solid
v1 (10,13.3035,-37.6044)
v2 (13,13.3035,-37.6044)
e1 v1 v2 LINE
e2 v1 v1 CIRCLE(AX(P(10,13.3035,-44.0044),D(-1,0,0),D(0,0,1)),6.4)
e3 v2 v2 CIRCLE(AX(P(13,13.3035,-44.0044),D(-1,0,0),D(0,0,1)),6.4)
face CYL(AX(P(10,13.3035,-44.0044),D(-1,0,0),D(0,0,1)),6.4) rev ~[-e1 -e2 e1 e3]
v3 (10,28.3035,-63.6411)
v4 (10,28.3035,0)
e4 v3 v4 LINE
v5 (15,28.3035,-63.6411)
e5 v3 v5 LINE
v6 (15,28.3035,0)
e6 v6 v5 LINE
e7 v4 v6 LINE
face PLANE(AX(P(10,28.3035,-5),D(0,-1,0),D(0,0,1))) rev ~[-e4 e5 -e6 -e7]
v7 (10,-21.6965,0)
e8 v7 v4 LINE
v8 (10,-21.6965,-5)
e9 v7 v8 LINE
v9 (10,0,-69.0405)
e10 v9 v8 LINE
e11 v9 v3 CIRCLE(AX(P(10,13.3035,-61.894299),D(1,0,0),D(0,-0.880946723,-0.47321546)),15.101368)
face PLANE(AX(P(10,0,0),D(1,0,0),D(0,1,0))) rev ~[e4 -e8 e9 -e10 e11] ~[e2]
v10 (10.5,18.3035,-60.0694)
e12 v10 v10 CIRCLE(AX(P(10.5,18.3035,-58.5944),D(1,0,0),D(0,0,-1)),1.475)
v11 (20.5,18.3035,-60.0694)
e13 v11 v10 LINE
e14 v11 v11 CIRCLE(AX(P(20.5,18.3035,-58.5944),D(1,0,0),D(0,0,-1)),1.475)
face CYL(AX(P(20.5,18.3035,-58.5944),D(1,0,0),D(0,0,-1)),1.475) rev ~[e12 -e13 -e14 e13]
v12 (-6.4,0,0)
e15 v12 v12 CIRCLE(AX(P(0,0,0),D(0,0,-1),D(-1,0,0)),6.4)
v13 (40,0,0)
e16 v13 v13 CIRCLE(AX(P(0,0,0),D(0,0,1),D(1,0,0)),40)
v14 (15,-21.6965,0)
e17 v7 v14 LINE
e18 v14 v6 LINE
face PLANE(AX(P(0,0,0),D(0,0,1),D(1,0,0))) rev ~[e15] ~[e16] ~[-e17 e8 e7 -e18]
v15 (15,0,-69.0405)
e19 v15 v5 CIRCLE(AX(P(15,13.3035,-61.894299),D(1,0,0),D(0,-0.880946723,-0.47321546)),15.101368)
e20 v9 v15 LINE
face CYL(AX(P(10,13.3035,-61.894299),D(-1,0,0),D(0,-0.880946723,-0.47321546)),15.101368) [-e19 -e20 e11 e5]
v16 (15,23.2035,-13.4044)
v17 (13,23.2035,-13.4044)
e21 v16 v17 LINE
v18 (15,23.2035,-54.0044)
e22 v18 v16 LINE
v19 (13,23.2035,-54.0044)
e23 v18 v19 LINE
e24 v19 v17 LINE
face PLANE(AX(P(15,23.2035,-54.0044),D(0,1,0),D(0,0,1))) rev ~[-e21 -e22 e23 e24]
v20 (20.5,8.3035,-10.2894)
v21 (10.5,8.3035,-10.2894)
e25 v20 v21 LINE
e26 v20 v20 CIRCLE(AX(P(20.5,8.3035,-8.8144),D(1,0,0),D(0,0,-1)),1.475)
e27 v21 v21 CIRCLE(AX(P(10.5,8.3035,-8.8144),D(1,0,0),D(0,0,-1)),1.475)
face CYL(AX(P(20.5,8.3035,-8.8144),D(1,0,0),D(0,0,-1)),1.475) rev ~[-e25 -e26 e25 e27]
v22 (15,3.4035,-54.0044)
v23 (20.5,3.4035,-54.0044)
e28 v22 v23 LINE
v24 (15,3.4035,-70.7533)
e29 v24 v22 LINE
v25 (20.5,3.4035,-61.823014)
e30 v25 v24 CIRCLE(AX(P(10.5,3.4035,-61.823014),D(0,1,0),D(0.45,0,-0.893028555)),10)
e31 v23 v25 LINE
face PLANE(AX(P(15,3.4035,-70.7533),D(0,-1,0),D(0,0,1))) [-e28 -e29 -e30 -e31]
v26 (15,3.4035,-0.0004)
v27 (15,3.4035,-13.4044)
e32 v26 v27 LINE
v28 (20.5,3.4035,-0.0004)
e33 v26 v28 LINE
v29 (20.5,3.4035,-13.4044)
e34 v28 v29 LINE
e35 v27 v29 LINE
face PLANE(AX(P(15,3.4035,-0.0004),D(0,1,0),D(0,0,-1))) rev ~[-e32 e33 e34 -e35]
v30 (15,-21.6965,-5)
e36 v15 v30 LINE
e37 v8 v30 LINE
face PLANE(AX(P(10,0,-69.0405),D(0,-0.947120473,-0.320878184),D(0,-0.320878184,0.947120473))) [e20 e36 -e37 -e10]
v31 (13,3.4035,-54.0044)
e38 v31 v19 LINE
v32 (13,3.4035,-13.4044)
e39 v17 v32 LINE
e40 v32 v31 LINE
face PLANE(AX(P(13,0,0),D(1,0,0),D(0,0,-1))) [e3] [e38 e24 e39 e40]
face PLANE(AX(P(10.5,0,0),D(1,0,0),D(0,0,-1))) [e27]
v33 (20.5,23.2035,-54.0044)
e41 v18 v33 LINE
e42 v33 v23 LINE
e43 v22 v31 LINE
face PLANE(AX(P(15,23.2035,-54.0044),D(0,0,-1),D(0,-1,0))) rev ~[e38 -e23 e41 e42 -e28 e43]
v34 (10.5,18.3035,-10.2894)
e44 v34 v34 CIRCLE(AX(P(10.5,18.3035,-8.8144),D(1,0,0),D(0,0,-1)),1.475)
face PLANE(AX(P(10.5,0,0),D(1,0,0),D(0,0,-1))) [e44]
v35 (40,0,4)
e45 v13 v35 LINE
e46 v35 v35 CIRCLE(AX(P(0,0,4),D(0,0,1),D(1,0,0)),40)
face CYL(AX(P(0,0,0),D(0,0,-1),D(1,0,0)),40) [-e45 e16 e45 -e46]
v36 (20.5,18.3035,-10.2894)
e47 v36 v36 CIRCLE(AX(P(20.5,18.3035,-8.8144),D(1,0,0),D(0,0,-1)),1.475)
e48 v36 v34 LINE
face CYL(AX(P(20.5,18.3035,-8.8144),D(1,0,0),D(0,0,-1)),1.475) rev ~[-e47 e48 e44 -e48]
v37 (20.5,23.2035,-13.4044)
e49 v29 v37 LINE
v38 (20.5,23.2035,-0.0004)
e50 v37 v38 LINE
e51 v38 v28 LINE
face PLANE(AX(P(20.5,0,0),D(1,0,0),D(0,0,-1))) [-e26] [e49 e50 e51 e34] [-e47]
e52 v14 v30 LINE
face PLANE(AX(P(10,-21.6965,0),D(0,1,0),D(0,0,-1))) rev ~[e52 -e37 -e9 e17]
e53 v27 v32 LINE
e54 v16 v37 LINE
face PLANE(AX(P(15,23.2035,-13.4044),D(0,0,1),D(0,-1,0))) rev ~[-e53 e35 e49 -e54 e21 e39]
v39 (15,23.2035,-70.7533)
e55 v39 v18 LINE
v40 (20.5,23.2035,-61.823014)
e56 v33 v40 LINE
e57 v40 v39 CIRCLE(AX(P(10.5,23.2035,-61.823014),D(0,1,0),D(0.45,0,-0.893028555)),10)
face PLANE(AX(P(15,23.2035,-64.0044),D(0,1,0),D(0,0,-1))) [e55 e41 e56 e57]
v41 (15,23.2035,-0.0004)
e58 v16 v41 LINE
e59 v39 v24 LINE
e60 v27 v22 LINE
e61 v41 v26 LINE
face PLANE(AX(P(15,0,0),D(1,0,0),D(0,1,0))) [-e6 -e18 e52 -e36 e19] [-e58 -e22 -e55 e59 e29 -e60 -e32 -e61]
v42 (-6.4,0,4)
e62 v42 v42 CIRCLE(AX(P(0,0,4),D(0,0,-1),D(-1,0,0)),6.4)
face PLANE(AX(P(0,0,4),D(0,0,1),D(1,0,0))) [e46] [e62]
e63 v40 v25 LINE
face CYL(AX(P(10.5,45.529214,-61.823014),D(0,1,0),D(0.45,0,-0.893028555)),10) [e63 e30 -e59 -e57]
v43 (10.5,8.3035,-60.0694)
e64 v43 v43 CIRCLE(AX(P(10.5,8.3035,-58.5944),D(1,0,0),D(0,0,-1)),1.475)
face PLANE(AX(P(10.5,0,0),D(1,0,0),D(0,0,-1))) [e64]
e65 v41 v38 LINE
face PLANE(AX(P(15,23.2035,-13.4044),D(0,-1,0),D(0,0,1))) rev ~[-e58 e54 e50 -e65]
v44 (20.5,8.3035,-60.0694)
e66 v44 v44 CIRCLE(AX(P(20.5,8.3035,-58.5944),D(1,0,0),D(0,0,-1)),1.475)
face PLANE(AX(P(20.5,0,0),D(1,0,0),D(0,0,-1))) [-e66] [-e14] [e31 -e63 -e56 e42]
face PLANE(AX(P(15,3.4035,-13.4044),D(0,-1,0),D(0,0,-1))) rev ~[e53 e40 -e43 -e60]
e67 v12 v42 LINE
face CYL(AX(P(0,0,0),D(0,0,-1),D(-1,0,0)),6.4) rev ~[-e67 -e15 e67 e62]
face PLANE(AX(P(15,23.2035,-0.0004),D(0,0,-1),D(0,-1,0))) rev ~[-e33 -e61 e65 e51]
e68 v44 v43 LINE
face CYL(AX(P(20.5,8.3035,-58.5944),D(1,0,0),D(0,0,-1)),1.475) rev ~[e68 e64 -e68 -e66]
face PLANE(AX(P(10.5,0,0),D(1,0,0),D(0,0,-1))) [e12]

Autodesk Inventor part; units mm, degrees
ref_plane "XZ Plane" through (0, 0, 0) normal (0, 1, 0) x (-1, 0, 0)
ref_plane "XY Plane" through (0, 0, 0) normal (0, 0, 1) x (1, 0, 0)
sketch "Sketch1" plane through (0, 0, 0) normal (0, 0, 1) x (1, 0, 0)
  circle A0 centre (0, 0) radius 40
  dimension "d0" = 80
extrude "Extrusion1" add sketch "Sketch1" along normal blind 4
ref_plane "Work Plane2" through (10, 0, 0) normal (1, 0, 0) x (0, 1, 0)
ref_plane "Work Plane1" through (-40, 0, 0) normal (1, 0, 0) x (0, 1, 0)
sketch "Sketch2" plane through (10, 0, 0) normal (1, 0, 0) x (0, 1, 0)
  line L0 (-21.6965, 0) -> (-21.6965, -5)
  line L1 (-21.6965, -5) -> (28.3035, -5)
  line L2 (28.3035, -5) -> (28.3035, 0)
  circle A0 centre (13.3035, -44.0044) radius 10
  line L3 (-21.6965, -5) -> (0, -41.2491)
  line L4 (28.3035, -5) -> (23.2249, -45.256)
  line L5 (-21.6965, 0) -> (28.3035, 0)
  line L6 (28.3035, -5) -> (28.3035, -63.6411)
  arc A1 (0, -69.0405) -> (28.3035, -60.1475) centre (13.3035, -61.8943) ccw
  arc A2 (4.8652, -49.3705) -> (4.8622, -49.3725) centre (13.3035, -61.8943) ccw
  line L7 (0, -69.0405) -> (-21.6965, -5)
  point P0 (0, 0)
  point P1 (11.1199, -34.2457)
  point P2 (4.723, -49.1401)
  dimension "d4" = 5
  dimension "d5" = 50
  dimension "d6" = 20
  dimension "d8" = 15
extrude "Extrusion4" add sketch "Sketch2" along normal blind 5 contours L5 L2 L1 L0 | L1 L6 A1 L7 | A0
sketch "Sketch3" plane through (10, 0, 0) normal (-1, 0, 0) x (0, 0, 1)
  arc A0 (-45.256, 23.2249) -> (-49.1401, 4.723) centre (-44.0044, 13.3035) ccw projected
  circle A1 centre (-44.0044, 13.3035) radius 6.4
  point P0 (0, 0)
  dimension "d15" = 12.8
extrude "Extrusion5" cut sketch "Sketch3" against normal through all
sketch "Sketch6" plane through (15, 0, 0) normal (1, 0, 0) x (0, 0, -1)
  point P0 (0, 0)
sketch "Sketch7" plane through (15, 0, 0) normal (1, 0, 0) x (0, 0, -1)
  line L0 (13.4044, 3.4035) -> (54.0044, 3.4035)
  line L1 (54.0044, 3.4035) -> (54.0044, 23.2035)
  line L2 (54.0044, 23.2035) -> (13.4044, 23.2035)
  line L3 (13.4044, 23.2035) -> (13.4044, 3.4035)
  line L4 (13.4044, 3.4035) -> (54.0044, 23.2035) construction
  line L5 (54.0044, 3.4035) -> (13.4044, 23.2035) construction
  circle A0 centre (44.0044, 13.3035) radius 6.4 projected
  point P0 (0, 0)
  point P1 (33.7044, 13.3035)
  dimension "d24" = 40.6
  dimension "d25" = 19.8
  dimension "d35" = 9.9
  dimension "d36" = 10
extrude "Extrusion8" cut sketch "Sketch7" against normal blind 2 contours L3 L2 L1 L0 | A0
sketch "Sketch8" plane through (15, 0, 0) normal (1, 0, 0) x (0, 0, -1)
  line L0 (54.0044, 23.2035) -> (54.0044, 3.4035) projected
  line L1 (54.0044, 23.2035) -> (64.0044, 23.2035)
  line L2 (64.0044, 23.2035) -> (64.0044, 3.4035)
  line L3 (64.0044, 3.4035) -> (54.0044, 3.4035)
  line L4 (54.0044, 3.4035) -> (54.0044, 23.2035)
  point P0 (0, 0)
  dimension "d28" = 10
  dimension "d29" = 19.8
extrude "Extrusion9" add sketch "Sketch8" along normal blind 5.5
sketch "Sketch9" plane through (15, 0, 0) normal (1, 0, 0) x (0, 0, -1)
  line L0 (64.0044, 23.2035) -> (64.0044, 3.4035) projected
  line L1 (64.0044, 23.2035) -> (70.7533, 23.2035)
  line L2 (70.7533, 23.2035) -> (70.7533, 3.4035)
  line L3 (70.7533, 3.4035) -> (64.0044, 3.4035)
  line L4 (64.0044, 3.4035) -> (64.0044, 23.2035)
  point P0 (0, 0)
extrude "Extrusion10" add sketch "Sketch9" along normal blind 5.5
fillet "Fillet1" radius 10 1 edges at (20.5, 13.3035, -70.7533)
sketch "Sketch10" plane through (15, 0, 0) normal (1, 0, 0) x (0, 0, -1)
  line L0 (13.4044, 3.4035) -> (13.4044, 23.2035)
  line L1 (13.4044, 3.4035) -> (13.4044, 23.2035) projected
  line L2 (13.4044, 23.2035) -> (0.0004, 23.2035)
  line L3 (0.0004, 23.2035) -> (0.0004, 3.4035)
  line L4 (0.0004, 3.4035) -> (13.4044, 3.4035)
  line L5 (13.4044, 3.4035) -> (13.4044, 23.2035)
  point P0 (0, 0)
  dimension "d38" = 13.404
extrude "Extrusion11" add sketch "Sketch10" along normal blind 5.5
sketch "Sketch11" plane through (20.5, 0, 0) normal (1, 0, 0) x (0, 0, -1)
  line L0 (0.0004, 23.2035) -> (13.4044, 23.2035) projected
  line L1 (13.4044, 23.2035) -> (8.8144, 23.2035)
  line L2 (13.4044, 18.3035) -> (13.4044, 23.2035)
  circle A0 centre (8.8144, 18.3035) radius 1.475
  line L3 (13.4044, 3.4035) -> (13.4044, 23.2035) projected
  line L4 (13.4044, 13.3035) -> (0.0004, 13.3035)
  line L5 (0.0004, 3.4035) -> (0.0004, 23.2035) projected
  circle A1 centre (8.8144, 8.3035) radius 1.475
  point P0 (0, 0)
  dimension "d43" = 2.95
  dimension "d44" = 2.95
extrude "Extrusion12" cut sketch "Sketch11" against normal blind 10 contours A0 | A1
sketch "Sketch12" plane through (20.5, 0, 0) normal (1, 0, 0) x (0, 0, -1)
  point P0 (0, 0)
sketch "Sketch13" plane through (10.5, 18.3035, -8.8144) normal (1, 0, 0) x (0, 0, -1)
  point P0 (-8.8144, -18.3035)
sketch "Sketch14" plane through (13, 0, 0) normal (1, 0, 0) x (0, 0, -1)
  circle A0 centre (8.8144, 18.3035) radius 1.475 projected
  line L0 (61.7531, 18.3035) -> (54.0044, 18.3035)
  line L1 (54.0044, 23.2035) -> (54.0044, 3.4035) projected
  point P0 (0, 0)
sketch "Sketch15" plane through (20.5, 0, 0) normal (1, 0, 0) x (0, 0, -1)
  circle A0 centre (8.8144, 18.3035) radius 1.475 projected
  line L0 (61.823, 23.2035) -> (61.823, 3.4035) projected
  circle A1 centre (8.8144, 8.3035) radius 1.475 projected
  line L1 (54.0044, 23.2035) -> (54.0044, 3.4035) projected
  circle A2 centre (58.5944, 18.3035) radius 1.475
  circle A3 centre (58.5944, 8.3035) radius 1.475
  point P0 (0, 0)
  dimension "d49" = 2.95
  dimension "d50" = 2.95
extrude "Extrusion13" cut sketch "Sketch15" against normal blind 10 contours A2 | A3
thread "Thread1" size "M3x0.5" class "6H" standard "ANSI Metric M Profile" full length
thread "Thread2" size "M3x0.5" class "6H" standard "ANSI Metric M Profile" full length
thread "Thread3" size "M3x0.5" class "6H" standard "ANSI Metric M Profile" full length
thread "Thread4" size "M3x0.5" class "6H" standard "ANSI Metric M Profile" full length
sketch "Sketch16" plane through (13, 0, 0) normal (1, 0, 0) x (0, 0, -1)
  point P0 (0, 0)
sketch "Sketch17" plane through (13, 0, 0) normal (1, 0, 0) x (0, 0, -1)
  point P0 (0, 0)
sketch "Sketch18" plane through (20.5, 0, 0) normal (1, 0, 0) x (0, 0, -1)
  point P0 (0, 0)
sketch "Sketch19" plane through (13, 0, 0) normal (1, 0, 0) x (0, 0, -1)
  point P0 (0, 0)
sketch "Sketch20" plane through (13, 0, 0) normal (1, 0, 0) x (0, 0, -1)
  point P0 (0, 0)
sketch "Sketch21" plane through (0, 0, 0) normal (0, 0, -1) x (-1, 0, 0)
  circle A0 centre (0, 0) radius 6.4
  dimension "d61" = 12.8
extrude "Extrusion14" cut sketch "Sketch21" against normal blind 10
sketch "Sketch22" plane through (13, 0, 0) normal (1, 0, 0) x (0, 0, -1)
  point P0 (0, 0)
sketch "Sketch23" plane through (0, 0, 0) normal (0, 0, -1) x (-1, 0, 0)
  point P0 (0, 0)
sketch "Sketch24" plane through (0, 0, 0) normal (0, 0, -1) x (-1, 0, 0)
  point P0 (0, 0)
sketch "Sketch25" plane through (0, 0, 0) normal (0, 0, -1) x (-1, 0, 0)
  point P0 (0, 0)
properties part number "wrist" material "Aluminum 6061"
